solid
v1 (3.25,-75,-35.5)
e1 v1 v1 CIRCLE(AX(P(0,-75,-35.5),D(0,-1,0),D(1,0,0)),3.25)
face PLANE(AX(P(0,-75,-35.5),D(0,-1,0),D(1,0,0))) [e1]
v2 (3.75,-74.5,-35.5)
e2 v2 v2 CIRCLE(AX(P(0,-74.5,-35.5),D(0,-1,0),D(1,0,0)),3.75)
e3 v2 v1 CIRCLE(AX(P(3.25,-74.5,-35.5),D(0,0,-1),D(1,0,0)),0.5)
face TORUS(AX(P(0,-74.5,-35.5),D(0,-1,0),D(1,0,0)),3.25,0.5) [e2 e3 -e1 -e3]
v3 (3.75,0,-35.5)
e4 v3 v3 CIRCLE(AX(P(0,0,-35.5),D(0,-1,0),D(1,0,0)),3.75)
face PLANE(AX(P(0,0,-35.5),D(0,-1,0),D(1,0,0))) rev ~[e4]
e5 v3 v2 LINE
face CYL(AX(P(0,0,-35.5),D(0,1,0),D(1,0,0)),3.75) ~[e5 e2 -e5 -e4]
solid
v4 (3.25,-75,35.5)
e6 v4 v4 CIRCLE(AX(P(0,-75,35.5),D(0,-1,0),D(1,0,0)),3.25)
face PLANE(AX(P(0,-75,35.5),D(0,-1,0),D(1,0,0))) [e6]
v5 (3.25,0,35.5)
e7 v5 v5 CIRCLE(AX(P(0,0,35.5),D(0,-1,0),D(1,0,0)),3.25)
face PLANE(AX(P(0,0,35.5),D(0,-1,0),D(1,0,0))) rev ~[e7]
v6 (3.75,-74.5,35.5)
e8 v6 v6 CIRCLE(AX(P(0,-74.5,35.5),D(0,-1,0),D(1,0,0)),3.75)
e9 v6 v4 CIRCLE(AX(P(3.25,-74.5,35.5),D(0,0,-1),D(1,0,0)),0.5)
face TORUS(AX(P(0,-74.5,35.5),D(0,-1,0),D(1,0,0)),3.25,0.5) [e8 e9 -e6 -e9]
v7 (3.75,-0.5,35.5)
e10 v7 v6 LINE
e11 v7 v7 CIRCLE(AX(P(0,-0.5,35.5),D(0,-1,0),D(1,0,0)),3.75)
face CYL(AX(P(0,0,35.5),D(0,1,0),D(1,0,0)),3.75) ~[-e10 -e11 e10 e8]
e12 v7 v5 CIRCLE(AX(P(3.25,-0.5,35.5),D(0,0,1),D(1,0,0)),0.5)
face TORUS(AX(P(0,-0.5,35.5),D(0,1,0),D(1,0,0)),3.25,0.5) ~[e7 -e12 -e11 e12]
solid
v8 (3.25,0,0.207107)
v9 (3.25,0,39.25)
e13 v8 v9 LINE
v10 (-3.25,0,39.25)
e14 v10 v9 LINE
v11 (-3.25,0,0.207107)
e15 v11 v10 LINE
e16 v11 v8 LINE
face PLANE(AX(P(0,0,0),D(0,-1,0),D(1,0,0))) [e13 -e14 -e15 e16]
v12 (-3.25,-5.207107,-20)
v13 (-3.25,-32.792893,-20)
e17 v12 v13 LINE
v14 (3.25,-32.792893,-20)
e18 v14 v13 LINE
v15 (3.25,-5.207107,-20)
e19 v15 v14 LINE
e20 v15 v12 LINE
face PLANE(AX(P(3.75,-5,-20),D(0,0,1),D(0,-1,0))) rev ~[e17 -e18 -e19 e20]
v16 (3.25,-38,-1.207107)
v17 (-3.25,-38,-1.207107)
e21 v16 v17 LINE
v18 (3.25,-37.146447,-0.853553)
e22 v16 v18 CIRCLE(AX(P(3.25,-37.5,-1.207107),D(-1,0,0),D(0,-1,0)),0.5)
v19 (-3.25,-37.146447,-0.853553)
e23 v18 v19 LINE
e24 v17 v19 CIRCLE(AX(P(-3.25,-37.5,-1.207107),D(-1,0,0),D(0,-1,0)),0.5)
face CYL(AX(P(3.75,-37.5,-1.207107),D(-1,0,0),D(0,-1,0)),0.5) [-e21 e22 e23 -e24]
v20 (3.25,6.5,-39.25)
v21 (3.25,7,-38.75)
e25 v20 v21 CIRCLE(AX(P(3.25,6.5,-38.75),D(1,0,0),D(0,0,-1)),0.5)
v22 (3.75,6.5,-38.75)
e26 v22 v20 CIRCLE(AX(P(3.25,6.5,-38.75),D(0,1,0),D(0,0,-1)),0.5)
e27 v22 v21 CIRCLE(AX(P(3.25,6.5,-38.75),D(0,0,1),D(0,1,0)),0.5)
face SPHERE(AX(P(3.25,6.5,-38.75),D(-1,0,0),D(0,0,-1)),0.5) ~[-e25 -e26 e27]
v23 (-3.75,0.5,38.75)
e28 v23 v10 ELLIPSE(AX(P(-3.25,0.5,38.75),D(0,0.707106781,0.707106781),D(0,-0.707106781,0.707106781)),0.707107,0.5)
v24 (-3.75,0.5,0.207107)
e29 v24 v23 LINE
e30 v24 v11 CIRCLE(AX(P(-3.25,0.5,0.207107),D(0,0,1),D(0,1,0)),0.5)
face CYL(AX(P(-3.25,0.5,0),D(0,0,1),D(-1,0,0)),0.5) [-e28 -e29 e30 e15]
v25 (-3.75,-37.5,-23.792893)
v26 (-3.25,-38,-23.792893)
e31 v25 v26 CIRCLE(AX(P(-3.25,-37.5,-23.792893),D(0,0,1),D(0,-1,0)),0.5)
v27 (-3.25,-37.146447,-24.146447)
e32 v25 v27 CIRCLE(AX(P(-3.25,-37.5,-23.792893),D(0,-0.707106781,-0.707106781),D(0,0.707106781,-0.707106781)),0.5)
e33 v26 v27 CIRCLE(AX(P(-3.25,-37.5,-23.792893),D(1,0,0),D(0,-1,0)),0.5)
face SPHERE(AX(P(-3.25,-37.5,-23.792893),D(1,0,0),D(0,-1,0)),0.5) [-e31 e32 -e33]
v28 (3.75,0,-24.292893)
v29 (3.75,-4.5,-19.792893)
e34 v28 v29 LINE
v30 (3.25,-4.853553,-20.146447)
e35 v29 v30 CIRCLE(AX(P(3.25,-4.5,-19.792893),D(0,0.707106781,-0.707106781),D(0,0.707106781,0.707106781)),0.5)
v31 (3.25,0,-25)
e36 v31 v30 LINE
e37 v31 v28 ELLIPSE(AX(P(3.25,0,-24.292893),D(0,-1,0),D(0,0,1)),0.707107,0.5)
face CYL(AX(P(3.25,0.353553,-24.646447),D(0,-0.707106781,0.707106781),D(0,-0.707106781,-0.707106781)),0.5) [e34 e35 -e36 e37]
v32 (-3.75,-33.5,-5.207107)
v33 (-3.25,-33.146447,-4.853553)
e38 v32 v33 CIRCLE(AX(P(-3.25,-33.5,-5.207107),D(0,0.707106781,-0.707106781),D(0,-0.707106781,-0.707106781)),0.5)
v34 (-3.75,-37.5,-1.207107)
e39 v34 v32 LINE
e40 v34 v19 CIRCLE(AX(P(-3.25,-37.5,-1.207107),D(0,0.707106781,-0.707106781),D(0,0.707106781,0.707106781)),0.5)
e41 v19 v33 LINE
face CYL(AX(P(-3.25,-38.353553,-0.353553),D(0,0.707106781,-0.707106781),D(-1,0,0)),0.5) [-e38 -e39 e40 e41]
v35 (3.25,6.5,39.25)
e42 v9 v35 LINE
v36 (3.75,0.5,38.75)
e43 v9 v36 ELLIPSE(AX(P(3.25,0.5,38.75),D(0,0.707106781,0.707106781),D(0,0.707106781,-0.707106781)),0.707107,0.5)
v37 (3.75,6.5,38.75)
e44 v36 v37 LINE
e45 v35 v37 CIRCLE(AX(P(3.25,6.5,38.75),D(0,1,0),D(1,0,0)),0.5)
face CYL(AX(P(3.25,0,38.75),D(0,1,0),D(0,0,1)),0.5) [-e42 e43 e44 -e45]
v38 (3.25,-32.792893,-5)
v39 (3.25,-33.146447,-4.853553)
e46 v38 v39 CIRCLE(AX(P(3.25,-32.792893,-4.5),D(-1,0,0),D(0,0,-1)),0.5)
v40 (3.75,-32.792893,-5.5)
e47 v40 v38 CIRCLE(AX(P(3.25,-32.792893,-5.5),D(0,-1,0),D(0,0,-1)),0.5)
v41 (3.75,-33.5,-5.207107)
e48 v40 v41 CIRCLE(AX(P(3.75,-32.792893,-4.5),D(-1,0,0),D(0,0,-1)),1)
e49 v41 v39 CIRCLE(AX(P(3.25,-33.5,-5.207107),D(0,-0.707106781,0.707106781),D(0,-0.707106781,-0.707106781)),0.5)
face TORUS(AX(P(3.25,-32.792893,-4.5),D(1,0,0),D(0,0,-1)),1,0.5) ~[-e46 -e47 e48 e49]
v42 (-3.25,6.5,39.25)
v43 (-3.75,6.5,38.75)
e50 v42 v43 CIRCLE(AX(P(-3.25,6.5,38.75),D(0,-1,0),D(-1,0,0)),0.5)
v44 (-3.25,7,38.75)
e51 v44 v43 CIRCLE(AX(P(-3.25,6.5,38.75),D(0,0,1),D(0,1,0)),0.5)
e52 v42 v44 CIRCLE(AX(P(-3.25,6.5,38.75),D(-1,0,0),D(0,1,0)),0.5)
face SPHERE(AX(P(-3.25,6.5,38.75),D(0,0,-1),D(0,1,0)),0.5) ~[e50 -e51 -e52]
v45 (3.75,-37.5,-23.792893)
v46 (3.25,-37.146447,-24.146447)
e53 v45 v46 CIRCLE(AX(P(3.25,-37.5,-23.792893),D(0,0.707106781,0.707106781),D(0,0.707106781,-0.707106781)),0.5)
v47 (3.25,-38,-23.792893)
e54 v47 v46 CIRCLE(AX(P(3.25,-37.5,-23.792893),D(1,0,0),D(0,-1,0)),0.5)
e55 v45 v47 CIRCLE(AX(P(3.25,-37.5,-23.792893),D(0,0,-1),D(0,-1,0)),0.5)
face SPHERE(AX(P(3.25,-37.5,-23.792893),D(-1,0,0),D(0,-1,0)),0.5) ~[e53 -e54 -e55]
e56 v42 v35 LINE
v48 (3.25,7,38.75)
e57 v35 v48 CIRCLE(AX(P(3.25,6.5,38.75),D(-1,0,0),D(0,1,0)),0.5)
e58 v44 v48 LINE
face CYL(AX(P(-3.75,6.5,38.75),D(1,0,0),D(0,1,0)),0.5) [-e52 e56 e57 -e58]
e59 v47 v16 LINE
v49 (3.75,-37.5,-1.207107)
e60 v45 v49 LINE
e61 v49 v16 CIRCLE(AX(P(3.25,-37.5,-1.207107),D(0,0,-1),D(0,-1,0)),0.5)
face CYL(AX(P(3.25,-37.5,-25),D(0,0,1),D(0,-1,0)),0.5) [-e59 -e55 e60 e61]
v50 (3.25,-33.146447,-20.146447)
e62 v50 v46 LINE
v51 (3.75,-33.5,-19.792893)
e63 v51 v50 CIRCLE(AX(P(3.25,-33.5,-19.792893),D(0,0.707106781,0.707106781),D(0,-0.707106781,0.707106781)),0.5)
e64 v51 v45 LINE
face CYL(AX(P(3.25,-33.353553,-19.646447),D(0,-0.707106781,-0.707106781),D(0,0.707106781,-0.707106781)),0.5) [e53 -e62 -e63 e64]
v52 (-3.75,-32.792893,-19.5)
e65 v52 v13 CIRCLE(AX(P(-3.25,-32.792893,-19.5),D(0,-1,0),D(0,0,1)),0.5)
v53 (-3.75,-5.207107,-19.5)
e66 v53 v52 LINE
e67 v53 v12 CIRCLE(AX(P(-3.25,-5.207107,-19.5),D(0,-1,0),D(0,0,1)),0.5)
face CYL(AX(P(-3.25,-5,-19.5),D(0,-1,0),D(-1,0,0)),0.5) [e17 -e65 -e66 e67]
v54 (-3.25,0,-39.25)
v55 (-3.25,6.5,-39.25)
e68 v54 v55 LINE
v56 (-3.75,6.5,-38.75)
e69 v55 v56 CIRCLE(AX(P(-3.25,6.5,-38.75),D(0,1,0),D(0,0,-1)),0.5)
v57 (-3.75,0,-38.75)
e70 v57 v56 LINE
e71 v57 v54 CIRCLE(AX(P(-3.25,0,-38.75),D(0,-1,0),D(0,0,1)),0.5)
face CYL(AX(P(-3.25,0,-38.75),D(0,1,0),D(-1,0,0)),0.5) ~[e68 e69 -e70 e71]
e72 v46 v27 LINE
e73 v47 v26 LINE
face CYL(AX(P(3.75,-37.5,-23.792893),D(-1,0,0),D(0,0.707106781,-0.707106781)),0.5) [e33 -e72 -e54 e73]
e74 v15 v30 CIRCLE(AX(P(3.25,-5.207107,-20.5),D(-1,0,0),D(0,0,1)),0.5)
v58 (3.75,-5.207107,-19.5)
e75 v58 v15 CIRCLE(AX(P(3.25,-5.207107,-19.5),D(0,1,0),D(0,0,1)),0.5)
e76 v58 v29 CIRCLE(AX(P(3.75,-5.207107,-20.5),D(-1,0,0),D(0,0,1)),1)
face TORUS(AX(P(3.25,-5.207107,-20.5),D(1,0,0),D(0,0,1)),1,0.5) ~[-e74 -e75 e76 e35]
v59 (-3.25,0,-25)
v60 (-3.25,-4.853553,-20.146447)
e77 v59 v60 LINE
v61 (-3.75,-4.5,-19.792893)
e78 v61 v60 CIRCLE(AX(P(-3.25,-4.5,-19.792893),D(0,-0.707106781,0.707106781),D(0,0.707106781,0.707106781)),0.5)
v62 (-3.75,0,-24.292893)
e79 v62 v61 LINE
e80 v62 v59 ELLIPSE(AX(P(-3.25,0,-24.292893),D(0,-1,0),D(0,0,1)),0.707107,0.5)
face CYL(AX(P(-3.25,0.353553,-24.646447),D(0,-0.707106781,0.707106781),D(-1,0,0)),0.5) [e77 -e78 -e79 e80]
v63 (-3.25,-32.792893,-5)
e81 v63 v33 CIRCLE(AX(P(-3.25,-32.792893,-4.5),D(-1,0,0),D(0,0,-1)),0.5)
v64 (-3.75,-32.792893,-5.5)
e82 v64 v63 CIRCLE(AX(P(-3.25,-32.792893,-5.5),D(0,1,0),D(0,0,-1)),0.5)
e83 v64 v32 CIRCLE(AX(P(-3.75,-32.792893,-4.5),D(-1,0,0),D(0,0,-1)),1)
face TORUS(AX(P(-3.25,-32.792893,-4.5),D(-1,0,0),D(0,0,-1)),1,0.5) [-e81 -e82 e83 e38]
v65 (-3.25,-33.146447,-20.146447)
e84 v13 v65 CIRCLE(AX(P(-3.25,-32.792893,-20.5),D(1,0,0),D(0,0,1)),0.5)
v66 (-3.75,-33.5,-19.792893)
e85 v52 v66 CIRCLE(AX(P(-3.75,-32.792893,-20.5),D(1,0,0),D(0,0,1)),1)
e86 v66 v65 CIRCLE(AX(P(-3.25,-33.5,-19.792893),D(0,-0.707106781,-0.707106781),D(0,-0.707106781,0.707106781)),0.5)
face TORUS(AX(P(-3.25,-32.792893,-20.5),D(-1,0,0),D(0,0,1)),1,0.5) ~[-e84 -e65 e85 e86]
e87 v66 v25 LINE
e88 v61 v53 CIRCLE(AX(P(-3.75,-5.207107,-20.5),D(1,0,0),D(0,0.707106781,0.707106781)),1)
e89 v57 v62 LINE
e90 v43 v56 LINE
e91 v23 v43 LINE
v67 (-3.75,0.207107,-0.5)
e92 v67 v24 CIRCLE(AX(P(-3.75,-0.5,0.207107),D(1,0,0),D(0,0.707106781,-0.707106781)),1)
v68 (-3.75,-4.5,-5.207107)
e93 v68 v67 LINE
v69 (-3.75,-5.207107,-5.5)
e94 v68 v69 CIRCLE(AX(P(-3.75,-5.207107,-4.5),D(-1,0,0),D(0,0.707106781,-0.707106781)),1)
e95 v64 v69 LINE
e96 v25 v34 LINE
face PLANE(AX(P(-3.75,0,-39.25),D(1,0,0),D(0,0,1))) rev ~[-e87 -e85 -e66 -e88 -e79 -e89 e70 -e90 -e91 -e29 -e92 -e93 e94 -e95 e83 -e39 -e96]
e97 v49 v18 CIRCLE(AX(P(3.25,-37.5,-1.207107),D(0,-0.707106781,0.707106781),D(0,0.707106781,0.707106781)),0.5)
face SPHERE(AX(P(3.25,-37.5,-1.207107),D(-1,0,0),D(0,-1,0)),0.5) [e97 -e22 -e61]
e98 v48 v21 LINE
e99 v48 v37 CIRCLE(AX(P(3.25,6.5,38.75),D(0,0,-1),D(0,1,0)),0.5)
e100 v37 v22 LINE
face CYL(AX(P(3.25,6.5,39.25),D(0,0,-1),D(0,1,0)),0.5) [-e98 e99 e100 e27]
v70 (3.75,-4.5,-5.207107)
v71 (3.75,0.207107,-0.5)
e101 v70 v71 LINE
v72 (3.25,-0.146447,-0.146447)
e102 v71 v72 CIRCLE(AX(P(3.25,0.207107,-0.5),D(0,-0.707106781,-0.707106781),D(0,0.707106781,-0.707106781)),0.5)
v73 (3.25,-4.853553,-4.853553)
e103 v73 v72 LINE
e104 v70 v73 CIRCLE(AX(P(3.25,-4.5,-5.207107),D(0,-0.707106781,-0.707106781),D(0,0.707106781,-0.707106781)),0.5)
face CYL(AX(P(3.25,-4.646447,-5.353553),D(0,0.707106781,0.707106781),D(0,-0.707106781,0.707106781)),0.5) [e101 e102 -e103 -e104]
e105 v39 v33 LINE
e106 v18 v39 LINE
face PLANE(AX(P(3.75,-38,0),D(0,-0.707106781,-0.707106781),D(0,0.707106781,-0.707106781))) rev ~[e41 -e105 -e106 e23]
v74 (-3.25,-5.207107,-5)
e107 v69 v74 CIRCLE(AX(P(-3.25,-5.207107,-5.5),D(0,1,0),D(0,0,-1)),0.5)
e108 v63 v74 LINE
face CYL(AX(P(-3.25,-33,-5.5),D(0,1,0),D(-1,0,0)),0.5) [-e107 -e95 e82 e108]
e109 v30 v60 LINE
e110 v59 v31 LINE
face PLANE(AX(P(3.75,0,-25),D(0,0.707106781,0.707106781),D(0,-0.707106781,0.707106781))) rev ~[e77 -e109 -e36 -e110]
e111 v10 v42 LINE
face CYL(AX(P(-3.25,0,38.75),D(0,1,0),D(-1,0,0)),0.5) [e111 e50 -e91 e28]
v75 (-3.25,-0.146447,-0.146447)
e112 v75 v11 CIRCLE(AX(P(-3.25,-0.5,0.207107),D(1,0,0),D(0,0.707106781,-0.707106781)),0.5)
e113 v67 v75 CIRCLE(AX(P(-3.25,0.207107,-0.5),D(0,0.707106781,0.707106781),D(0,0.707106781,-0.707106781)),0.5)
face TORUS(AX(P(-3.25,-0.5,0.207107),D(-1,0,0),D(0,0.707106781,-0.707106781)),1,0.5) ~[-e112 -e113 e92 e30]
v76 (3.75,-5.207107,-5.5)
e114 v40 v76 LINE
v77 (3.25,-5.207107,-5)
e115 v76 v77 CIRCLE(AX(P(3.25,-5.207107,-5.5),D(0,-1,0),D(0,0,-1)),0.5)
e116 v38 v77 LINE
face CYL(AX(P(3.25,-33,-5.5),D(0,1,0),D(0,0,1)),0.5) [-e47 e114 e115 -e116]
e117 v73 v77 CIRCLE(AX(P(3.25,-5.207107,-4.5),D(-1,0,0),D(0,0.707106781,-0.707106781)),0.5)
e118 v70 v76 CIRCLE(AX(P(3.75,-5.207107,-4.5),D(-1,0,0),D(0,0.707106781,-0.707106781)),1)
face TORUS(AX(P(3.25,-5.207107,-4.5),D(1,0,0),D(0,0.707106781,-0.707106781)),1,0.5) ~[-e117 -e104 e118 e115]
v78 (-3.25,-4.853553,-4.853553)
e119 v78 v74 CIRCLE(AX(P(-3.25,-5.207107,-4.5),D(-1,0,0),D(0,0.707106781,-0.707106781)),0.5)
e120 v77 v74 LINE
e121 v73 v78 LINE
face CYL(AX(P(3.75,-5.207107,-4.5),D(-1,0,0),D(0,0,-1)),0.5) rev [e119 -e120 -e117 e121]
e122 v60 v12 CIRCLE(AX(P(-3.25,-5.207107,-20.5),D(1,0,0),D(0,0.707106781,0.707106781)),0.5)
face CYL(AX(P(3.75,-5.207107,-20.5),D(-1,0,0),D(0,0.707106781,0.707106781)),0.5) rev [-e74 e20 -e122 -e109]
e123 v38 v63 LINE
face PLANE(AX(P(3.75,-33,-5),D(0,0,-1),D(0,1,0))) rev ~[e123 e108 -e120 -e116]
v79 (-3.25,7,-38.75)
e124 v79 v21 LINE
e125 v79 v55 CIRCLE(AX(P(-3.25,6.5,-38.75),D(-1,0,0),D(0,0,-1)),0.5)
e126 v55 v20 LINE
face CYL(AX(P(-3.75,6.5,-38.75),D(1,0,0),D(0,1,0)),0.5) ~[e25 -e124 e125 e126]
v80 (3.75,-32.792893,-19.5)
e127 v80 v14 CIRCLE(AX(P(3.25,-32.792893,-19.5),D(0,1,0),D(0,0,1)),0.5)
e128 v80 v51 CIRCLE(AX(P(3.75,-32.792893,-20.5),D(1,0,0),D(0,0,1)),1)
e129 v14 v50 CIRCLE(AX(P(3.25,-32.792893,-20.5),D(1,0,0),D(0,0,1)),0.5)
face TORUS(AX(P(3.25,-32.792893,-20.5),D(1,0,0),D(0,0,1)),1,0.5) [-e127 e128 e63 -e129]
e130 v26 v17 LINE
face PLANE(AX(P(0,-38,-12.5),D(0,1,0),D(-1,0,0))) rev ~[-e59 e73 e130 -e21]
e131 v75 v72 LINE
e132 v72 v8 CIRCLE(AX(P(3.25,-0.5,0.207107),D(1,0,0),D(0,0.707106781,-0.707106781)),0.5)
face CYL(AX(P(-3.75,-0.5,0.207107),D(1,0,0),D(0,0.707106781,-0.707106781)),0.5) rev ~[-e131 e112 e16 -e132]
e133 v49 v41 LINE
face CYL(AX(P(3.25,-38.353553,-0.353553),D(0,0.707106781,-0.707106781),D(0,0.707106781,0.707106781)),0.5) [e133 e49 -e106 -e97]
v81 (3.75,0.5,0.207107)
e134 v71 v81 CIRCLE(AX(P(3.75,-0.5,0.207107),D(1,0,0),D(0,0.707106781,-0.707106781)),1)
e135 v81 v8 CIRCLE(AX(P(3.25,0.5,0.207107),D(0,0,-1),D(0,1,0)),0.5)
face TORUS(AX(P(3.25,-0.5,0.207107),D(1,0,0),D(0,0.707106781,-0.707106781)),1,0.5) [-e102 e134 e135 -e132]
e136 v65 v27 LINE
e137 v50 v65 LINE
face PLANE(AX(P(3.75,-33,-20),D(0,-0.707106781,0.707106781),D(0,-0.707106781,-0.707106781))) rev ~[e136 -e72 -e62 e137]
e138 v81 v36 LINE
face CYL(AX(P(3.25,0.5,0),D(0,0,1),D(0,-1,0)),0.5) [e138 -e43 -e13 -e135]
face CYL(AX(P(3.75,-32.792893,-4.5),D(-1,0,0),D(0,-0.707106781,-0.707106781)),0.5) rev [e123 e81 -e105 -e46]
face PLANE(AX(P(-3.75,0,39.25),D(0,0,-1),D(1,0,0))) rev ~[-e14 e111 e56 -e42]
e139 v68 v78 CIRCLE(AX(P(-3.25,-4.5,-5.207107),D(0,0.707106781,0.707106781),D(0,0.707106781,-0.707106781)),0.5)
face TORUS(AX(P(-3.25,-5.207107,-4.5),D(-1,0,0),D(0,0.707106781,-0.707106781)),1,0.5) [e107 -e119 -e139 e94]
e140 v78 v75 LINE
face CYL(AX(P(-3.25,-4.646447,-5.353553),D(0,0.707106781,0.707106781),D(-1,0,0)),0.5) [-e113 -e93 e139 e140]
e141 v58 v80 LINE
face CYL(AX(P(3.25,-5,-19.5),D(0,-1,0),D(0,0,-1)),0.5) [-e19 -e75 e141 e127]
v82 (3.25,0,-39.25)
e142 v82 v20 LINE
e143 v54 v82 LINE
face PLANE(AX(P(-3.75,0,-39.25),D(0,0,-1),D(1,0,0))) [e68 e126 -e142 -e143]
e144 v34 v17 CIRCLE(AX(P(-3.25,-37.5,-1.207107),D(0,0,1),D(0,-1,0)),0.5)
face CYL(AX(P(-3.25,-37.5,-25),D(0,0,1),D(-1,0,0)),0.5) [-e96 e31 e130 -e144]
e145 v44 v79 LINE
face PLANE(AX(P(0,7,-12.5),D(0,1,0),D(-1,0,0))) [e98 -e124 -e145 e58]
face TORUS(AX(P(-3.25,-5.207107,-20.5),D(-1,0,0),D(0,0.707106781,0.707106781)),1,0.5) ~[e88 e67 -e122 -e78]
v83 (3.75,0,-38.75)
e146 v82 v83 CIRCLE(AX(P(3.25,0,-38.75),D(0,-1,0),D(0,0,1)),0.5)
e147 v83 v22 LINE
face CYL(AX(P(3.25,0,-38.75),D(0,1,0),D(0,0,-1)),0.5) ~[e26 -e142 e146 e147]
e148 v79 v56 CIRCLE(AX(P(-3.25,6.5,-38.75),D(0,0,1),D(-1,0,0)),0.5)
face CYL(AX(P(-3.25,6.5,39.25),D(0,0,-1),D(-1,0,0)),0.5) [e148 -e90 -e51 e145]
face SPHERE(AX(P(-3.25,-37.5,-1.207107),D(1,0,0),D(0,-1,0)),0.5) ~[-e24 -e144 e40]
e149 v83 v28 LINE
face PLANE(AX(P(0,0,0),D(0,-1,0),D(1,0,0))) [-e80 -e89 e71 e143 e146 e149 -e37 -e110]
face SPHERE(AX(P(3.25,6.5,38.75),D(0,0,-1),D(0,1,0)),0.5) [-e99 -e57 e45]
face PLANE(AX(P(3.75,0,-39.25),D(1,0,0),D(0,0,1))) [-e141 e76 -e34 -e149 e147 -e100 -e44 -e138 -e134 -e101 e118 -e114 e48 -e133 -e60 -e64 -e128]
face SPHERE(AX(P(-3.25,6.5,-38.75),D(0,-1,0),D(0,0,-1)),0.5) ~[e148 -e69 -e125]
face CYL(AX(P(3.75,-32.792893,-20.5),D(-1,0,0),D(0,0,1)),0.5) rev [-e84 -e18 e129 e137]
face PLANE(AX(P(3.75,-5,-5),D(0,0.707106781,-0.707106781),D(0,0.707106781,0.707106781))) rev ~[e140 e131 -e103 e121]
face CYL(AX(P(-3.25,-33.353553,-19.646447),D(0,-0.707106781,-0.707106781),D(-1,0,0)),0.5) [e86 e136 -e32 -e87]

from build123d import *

# Parameters (mm, degrees)
F0_R     = 3.75
F1_DEPTH = 75
F2_W     = 7.5
F2_H     = 78.5
F3_DEPTH = 7
F4_W     = 7.5
F4_H     = 25
F5_DEPTH = 45
F7_DEPTH = 25
F8_R     = 0.5
F8_2_R   = 0.5
F8_3_R   = 0.5


with BuildPart() as f1:
    # F0 (on Front) → F1 (new body)
    with BuildSketch(Plane.XZ):
        with Locations((0, 35.5)):
            Circle(F0_R)
    extrude(amount=F1_DEPTH)

    # F8
    f8_edges = [f1.edges().sort_by_distance(p)[0] for p in [
        (-3.75, -75, 35.5),
        (3.75, -37.5, 35.5),
        (-3.75, 0, 35.5),
    ]]
    fillet(f8_edges, radius=F8_R)


with BuildPart() as f1b:
    # F0 (on Front) → F1, piece 2 (new body)
    with BuildSketch(Plane.XZ):
        with Locations((0, -35.5)):
            Circle(F0_R)
    extrude(amount=F1_DEPTH)

    # F8#2
    f8_2_edges = [f1b.edges().sort_by_distance(p)[0] for p in [
        (-3.75, -75, -35.5),
    ]]
    fillet(f8_2_edges, radius=F8_2_R)


with BuildPart() as f3:
    # F2 (on Front) → F3 (new body)
    with BuildSketch(Plane.XZ):
        Rectangle(F2_W, F2_H)
    extrude(amount=-F3_DEPTH)

    # F4 (on face) → F5 (join)
    with BuildSketch(Plane(origin=(0, 7, 0), x_dir=(-1, 0, 0), z_dir=(0, 1, 0))):
        with Locations((0, -12.5)):
            Rectangle(F4_W, F4_H)
    extrude(amount=-F5_DEPTH)

    # F6 (on face) → F7 (cut)
    with BuildSketch(Plane.YZ.offset(3.75)):
        Polygon((0, 0), (-38, 0), (-33, -5), (-5, -5), align=None)
        Polygon((-33, -20), (-38, -25), (0, -25), (-5, -20), align=None)
    extrude(amount=-F7_DEPTH, mode=Mode.SUBTRACT)

    # F8#3
    f8_3_edges = [f3.edges().sort_by_distance(p)[0] for p in [
        (-3.75, 3.5, -39.25),
        (0, 7, -39.25),
        (3.75, 3.5, -39.25),
        (-3.75, 7, 0),
        (3.75, 7, 0),
        (3.75, -19, -20),
        (3.75, -2.5, -22.5),
        (-3.75, -2.5, -22.5),
        (-3.75, -19, -20),
        (0, -5, -20),
        (0, 0, 0),
        (0, -5, -5),
        (3.75, -2.5, -2.5),
        (3.75, -19, -5),
        (-3.75, -2.5, -2.5),
        (-3.75, 0, 19.625),
        (-3.75, -35.5, -2.5),
        (0, 7, 39.25),
        (3.75, 3.5, 39.25),
        (-3.75, 3.5, 39.25),
        (0, -38, -25),
        (0, -38, 0),
        (3.75, -38, -12.5),
        (-3.75, -38, -12.5),
        (3.75, -35.5, -22.5),
        (-3.75, -35.5, -22.5),
        (0, -33, -20),
        (3.75, -35.5, -2.5),
        (0, -33, -5),
        (3.75, 0, 19.625),
        (-3.75, -19, -5),
    ]]
    fillet(f8_3_edges, radius=F8_3_R)


solid = Compound([f1.part, f1b.part, f3.part])
